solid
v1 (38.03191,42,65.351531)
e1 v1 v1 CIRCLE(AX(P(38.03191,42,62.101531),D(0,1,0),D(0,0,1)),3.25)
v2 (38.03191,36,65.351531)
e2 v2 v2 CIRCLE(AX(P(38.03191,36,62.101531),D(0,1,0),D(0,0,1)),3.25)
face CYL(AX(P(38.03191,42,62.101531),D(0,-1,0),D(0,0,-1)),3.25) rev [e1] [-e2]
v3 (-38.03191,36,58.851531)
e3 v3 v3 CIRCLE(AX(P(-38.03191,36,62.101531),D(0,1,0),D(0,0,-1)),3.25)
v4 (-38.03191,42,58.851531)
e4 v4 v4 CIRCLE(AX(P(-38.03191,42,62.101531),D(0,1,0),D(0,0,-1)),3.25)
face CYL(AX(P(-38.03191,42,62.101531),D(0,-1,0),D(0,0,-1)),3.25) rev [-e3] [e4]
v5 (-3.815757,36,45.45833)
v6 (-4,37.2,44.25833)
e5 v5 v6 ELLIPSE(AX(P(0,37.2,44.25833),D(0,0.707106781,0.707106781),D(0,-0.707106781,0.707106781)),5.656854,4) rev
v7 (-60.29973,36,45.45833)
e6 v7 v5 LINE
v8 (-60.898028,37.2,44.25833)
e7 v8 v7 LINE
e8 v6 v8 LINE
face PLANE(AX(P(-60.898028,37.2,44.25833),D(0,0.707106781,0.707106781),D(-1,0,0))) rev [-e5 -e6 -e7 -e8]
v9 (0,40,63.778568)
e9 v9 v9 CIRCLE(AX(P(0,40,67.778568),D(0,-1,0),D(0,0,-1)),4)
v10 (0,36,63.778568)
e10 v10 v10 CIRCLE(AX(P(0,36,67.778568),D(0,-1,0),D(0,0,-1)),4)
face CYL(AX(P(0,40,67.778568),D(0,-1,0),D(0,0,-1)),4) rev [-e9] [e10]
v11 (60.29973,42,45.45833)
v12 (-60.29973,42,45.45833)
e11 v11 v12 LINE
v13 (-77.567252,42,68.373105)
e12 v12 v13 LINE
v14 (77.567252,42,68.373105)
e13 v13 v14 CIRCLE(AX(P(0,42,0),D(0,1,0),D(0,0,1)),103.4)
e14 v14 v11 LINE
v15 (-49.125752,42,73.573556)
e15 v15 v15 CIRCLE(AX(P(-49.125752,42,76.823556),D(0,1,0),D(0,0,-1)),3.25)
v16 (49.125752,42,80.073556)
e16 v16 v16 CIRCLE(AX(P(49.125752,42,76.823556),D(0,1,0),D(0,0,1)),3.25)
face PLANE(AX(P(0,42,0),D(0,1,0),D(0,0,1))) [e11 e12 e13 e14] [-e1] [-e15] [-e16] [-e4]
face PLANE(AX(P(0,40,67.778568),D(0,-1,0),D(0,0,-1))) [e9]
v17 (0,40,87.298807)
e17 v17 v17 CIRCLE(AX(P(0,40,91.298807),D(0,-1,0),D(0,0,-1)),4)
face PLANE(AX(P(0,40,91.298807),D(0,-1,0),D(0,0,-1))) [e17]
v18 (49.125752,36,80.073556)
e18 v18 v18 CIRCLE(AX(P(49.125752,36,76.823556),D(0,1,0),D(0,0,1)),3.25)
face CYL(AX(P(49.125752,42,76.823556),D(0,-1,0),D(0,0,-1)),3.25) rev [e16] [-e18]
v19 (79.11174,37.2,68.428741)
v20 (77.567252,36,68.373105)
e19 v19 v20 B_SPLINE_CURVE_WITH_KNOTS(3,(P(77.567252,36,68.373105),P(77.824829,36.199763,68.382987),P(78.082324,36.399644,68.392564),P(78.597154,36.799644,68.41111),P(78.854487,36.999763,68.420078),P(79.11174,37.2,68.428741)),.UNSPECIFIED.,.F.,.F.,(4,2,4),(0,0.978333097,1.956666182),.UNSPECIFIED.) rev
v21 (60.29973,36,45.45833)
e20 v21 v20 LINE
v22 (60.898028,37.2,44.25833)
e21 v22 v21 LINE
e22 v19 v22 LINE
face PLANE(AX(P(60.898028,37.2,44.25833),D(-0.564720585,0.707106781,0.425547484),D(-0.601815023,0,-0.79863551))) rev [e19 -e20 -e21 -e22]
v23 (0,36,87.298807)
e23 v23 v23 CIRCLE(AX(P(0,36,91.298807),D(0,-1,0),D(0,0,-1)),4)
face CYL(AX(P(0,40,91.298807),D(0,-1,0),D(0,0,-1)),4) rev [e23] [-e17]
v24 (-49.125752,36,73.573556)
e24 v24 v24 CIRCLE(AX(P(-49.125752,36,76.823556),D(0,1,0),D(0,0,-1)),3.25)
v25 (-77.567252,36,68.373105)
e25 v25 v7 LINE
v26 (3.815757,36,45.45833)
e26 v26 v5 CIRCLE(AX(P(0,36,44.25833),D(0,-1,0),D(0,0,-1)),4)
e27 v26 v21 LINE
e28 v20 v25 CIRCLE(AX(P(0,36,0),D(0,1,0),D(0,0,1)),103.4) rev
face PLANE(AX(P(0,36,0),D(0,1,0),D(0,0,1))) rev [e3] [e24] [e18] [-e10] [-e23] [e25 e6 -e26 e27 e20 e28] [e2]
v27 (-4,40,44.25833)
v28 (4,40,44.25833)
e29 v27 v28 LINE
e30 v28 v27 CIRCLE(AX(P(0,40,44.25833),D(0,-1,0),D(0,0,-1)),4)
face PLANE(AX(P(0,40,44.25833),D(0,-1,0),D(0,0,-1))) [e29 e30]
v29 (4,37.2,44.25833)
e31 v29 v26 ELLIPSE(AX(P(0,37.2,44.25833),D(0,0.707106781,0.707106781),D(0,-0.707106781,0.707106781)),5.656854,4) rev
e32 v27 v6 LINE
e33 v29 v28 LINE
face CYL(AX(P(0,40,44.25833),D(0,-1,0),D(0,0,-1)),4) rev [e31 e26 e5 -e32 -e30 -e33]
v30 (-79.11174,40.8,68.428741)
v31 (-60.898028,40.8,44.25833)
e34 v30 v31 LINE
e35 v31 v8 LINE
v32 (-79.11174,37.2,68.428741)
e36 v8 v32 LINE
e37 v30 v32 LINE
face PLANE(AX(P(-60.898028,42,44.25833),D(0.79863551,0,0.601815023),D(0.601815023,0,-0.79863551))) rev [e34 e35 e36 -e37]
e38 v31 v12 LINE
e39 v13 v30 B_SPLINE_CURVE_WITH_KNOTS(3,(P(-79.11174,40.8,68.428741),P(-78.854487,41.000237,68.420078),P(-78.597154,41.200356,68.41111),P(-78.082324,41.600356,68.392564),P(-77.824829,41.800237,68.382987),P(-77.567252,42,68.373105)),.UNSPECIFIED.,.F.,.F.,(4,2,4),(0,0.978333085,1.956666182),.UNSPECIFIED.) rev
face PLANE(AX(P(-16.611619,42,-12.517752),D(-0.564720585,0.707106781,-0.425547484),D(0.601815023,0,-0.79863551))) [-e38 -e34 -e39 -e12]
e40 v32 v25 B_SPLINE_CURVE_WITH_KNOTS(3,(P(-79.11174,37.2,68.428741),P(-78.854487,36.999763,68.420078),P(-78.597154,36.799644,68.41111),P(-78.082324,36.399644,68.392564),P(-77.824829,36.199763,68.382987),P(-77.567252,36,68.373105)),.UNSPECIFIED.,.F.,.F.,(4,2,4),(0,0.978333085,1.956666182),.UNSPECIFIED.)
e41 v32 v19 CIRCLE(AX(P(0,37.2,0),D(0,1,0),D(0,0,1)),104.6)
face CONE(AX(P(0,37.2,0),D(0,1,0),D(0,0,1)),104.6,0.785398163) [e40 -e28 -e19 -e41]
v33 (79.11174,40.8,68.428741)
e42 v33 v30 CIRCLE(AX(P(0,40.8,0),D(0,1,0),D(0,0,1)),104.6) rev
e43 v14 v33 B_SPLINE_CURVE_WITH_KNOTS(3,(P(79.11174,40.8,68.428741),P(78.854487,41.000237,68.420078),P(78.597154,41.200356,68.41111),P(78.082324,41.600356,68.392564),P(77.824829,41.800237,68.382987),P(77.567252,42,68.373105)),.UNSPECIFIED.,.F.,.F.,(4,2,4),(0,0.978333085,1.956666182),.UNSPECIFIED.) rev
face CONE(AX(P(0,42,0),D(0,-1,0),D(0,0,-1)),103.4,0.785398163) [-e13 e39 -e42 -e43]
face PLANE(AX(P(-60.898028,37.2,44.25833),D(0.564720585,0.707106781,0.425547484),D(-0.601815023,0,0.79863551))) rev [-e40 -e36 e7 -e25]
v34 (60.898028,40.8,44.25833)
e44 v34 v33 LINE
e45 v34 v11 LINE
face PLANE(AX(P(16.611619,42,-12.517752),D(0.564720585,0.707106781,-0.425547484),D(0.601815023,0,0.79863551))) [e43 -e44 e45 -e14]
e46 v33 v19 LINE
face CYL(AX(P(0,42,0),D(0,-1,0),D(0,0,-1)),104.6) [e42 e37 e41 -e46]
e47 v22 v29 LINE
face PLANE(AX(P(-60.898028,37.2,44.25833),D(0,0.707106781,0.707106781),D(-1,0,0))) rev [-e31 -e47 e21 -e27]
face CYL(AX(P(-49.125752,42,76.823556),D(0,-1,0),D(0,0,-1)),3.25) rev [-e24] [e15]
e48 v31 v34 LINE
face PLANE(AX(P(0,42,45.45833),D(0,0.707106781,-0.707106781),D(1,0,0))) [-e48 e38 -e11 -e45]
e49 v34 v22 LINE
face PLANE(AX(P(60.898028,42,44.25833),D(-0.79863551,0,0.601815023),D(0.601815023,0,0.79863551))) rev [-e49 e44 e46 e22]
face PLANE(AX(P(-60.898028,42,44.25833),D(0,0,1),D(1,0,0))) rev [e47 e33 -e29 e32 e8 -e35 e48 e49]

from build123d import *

# Parameters (mm, degrees)
SKETCH1_R           = 3.25
BOSS_EXTRUDE1_DEPTH = 6
SKETCH2_R           = 4
CUT_EXTRUDE1_DEPTH  = 4
CHAMFER1_START      = -18.742104721
CHAMFER1_2_DEPTH    = 45.742104721
CHAMFER1_START_2    = -27
CHAMFER1_3_DEPTH    = 45.742104721
CHAMFER2_SIZE       = 1.2


with BuildPart() as part:
    # Sketch1 → Boss-Extrude1 (new body)
    with BuildSketch(Plane(origin=(0, 36, 0), x_dir=(1, 0, 0), z_dir=(0, 1, 0))):
        with BuildLine():
            Line((-60.898028106, -44.25832974), (60.898028106, -44.25832974))
            Line((60.898028106, -44.25832974), (79.111739679, -68.428741366))
            ThreePointArc((79.111739679, -68.428741366), (0, -104.6), (-79.111739679, -68.428741366))
            Line((-79.111739679, -68.428741366), (-60.898028106, -44.25832974))
        make_face()
        with Locations(Location((38.031910385, -62.101530721, 0), (0, 0, 270))):
            Circle(SKETCH1_R, mode=Mode.SUBTRACT)
        with Locations(Location((49.125752403, -76.823556322, 0), (0, 0, 270))):
            Circle(SKETCH1_R, mode=Mode.SUBTRACT)
        with Locations(Location((-49.125752403, -76.823556322, 0), (0, 0, 90))):
            Circle(SKETCH1_R, mode=Mode.SUBTRACT)
        with Locations(Location((-38.031910385, -62.101530721, 0), (0, 0, 90))):
            Circle(SKETCH1_R, mode=Mode.SUBTRACT)
    extrude(amount=BOSS_EXTRUDE1_DEPTH)

    # Sketch2 → Cut-Extrude1 (cut)
    with BuildSketch(Plane.XZ.offset(-36)):
        with Locations(Location((0, 91.29880712, 0), (0, 0, 270))):
            Circle(SKETCH2_R)
        with Locations(Location((0, 67.77856843, 0), (0, 0, 270))):
            Circle(SKETCH2_R)
        with Locations((0, 44.25832974)):
            Circle(SKETCH2_R)
    extrude(amount=-CUT_EXTRUDE1_DEPTH, mode=Mode.SUBTRACT)

    # Chamfer1: read off the stored shape, not the designer's step
    # Chamfer1 outline → Chamfer1 (revolve, cut)
    with BuildSketch(Plane.XY):
        Polygon((104.6, 37.2), (103.4, 36), (104.6, 36), align=None)
    revolve(axis=Axis((0, 0, 0), (0, 1, 0)), mode=Mode.SUBTRACT)

    # Chamfer1 2 outline → Chamfer1 2 (cut)
    with BuildSketch(Plane(origin=(0, 0, 0), x_dir=(0.9431059319759283, 0.23510763606464977, -0.23510763606464977), z_dir=(0.3324924075401055, -0.6668765998774377, 0.6668765998774377)).offset(CHAMFER1_START)):
        Polygon((46, 57.599737343), (-59.092758772, 57.599737343), (-81.95286654, 74.690799308), (-83, 75.473675007), (-83, 56), (46, 56), align=None)
    extrude(amount=CHAMFER1_2_DEPTH, mode=Mode.SUBTRACT)

    # Chamfer1 3 outline → Chamfer1 3 (cut)
    with BuildSketch(Plane(origin=(0, 0, 0), x_dir=(0.9431059319759302, -0.23510763606464624, 0.23510763606464624), z_dir=(0.33249240754010045, 0.6668765998774391, -0.6668765998774391)).offset(CHAMFER1_START_2)):
        Polygon((-45, -57.599737343), (59.092758772, -57.599737343), (81.95286654, -74.690799308), (83, -75.473675007), (83, -56), (-45, -56), align=None)
    extrude(amount=CHAMFER1_3_DEPTH, mode=Mode.SUBTRACT)

    # Chamfer2
    chamfer2_edges = [part.edges().sort_by_distance(p)[0] for p in [
        (70.004883892, 42, 56.343535553),
        (0, 42, 44.25832974),
        (-70.004883892, 42, 56.343535553),
        (0, 42, 104.6),
    ]]
    chamfer(chamfer2_edges, length=CHAMFER2_SIZE)


solid = part.part
